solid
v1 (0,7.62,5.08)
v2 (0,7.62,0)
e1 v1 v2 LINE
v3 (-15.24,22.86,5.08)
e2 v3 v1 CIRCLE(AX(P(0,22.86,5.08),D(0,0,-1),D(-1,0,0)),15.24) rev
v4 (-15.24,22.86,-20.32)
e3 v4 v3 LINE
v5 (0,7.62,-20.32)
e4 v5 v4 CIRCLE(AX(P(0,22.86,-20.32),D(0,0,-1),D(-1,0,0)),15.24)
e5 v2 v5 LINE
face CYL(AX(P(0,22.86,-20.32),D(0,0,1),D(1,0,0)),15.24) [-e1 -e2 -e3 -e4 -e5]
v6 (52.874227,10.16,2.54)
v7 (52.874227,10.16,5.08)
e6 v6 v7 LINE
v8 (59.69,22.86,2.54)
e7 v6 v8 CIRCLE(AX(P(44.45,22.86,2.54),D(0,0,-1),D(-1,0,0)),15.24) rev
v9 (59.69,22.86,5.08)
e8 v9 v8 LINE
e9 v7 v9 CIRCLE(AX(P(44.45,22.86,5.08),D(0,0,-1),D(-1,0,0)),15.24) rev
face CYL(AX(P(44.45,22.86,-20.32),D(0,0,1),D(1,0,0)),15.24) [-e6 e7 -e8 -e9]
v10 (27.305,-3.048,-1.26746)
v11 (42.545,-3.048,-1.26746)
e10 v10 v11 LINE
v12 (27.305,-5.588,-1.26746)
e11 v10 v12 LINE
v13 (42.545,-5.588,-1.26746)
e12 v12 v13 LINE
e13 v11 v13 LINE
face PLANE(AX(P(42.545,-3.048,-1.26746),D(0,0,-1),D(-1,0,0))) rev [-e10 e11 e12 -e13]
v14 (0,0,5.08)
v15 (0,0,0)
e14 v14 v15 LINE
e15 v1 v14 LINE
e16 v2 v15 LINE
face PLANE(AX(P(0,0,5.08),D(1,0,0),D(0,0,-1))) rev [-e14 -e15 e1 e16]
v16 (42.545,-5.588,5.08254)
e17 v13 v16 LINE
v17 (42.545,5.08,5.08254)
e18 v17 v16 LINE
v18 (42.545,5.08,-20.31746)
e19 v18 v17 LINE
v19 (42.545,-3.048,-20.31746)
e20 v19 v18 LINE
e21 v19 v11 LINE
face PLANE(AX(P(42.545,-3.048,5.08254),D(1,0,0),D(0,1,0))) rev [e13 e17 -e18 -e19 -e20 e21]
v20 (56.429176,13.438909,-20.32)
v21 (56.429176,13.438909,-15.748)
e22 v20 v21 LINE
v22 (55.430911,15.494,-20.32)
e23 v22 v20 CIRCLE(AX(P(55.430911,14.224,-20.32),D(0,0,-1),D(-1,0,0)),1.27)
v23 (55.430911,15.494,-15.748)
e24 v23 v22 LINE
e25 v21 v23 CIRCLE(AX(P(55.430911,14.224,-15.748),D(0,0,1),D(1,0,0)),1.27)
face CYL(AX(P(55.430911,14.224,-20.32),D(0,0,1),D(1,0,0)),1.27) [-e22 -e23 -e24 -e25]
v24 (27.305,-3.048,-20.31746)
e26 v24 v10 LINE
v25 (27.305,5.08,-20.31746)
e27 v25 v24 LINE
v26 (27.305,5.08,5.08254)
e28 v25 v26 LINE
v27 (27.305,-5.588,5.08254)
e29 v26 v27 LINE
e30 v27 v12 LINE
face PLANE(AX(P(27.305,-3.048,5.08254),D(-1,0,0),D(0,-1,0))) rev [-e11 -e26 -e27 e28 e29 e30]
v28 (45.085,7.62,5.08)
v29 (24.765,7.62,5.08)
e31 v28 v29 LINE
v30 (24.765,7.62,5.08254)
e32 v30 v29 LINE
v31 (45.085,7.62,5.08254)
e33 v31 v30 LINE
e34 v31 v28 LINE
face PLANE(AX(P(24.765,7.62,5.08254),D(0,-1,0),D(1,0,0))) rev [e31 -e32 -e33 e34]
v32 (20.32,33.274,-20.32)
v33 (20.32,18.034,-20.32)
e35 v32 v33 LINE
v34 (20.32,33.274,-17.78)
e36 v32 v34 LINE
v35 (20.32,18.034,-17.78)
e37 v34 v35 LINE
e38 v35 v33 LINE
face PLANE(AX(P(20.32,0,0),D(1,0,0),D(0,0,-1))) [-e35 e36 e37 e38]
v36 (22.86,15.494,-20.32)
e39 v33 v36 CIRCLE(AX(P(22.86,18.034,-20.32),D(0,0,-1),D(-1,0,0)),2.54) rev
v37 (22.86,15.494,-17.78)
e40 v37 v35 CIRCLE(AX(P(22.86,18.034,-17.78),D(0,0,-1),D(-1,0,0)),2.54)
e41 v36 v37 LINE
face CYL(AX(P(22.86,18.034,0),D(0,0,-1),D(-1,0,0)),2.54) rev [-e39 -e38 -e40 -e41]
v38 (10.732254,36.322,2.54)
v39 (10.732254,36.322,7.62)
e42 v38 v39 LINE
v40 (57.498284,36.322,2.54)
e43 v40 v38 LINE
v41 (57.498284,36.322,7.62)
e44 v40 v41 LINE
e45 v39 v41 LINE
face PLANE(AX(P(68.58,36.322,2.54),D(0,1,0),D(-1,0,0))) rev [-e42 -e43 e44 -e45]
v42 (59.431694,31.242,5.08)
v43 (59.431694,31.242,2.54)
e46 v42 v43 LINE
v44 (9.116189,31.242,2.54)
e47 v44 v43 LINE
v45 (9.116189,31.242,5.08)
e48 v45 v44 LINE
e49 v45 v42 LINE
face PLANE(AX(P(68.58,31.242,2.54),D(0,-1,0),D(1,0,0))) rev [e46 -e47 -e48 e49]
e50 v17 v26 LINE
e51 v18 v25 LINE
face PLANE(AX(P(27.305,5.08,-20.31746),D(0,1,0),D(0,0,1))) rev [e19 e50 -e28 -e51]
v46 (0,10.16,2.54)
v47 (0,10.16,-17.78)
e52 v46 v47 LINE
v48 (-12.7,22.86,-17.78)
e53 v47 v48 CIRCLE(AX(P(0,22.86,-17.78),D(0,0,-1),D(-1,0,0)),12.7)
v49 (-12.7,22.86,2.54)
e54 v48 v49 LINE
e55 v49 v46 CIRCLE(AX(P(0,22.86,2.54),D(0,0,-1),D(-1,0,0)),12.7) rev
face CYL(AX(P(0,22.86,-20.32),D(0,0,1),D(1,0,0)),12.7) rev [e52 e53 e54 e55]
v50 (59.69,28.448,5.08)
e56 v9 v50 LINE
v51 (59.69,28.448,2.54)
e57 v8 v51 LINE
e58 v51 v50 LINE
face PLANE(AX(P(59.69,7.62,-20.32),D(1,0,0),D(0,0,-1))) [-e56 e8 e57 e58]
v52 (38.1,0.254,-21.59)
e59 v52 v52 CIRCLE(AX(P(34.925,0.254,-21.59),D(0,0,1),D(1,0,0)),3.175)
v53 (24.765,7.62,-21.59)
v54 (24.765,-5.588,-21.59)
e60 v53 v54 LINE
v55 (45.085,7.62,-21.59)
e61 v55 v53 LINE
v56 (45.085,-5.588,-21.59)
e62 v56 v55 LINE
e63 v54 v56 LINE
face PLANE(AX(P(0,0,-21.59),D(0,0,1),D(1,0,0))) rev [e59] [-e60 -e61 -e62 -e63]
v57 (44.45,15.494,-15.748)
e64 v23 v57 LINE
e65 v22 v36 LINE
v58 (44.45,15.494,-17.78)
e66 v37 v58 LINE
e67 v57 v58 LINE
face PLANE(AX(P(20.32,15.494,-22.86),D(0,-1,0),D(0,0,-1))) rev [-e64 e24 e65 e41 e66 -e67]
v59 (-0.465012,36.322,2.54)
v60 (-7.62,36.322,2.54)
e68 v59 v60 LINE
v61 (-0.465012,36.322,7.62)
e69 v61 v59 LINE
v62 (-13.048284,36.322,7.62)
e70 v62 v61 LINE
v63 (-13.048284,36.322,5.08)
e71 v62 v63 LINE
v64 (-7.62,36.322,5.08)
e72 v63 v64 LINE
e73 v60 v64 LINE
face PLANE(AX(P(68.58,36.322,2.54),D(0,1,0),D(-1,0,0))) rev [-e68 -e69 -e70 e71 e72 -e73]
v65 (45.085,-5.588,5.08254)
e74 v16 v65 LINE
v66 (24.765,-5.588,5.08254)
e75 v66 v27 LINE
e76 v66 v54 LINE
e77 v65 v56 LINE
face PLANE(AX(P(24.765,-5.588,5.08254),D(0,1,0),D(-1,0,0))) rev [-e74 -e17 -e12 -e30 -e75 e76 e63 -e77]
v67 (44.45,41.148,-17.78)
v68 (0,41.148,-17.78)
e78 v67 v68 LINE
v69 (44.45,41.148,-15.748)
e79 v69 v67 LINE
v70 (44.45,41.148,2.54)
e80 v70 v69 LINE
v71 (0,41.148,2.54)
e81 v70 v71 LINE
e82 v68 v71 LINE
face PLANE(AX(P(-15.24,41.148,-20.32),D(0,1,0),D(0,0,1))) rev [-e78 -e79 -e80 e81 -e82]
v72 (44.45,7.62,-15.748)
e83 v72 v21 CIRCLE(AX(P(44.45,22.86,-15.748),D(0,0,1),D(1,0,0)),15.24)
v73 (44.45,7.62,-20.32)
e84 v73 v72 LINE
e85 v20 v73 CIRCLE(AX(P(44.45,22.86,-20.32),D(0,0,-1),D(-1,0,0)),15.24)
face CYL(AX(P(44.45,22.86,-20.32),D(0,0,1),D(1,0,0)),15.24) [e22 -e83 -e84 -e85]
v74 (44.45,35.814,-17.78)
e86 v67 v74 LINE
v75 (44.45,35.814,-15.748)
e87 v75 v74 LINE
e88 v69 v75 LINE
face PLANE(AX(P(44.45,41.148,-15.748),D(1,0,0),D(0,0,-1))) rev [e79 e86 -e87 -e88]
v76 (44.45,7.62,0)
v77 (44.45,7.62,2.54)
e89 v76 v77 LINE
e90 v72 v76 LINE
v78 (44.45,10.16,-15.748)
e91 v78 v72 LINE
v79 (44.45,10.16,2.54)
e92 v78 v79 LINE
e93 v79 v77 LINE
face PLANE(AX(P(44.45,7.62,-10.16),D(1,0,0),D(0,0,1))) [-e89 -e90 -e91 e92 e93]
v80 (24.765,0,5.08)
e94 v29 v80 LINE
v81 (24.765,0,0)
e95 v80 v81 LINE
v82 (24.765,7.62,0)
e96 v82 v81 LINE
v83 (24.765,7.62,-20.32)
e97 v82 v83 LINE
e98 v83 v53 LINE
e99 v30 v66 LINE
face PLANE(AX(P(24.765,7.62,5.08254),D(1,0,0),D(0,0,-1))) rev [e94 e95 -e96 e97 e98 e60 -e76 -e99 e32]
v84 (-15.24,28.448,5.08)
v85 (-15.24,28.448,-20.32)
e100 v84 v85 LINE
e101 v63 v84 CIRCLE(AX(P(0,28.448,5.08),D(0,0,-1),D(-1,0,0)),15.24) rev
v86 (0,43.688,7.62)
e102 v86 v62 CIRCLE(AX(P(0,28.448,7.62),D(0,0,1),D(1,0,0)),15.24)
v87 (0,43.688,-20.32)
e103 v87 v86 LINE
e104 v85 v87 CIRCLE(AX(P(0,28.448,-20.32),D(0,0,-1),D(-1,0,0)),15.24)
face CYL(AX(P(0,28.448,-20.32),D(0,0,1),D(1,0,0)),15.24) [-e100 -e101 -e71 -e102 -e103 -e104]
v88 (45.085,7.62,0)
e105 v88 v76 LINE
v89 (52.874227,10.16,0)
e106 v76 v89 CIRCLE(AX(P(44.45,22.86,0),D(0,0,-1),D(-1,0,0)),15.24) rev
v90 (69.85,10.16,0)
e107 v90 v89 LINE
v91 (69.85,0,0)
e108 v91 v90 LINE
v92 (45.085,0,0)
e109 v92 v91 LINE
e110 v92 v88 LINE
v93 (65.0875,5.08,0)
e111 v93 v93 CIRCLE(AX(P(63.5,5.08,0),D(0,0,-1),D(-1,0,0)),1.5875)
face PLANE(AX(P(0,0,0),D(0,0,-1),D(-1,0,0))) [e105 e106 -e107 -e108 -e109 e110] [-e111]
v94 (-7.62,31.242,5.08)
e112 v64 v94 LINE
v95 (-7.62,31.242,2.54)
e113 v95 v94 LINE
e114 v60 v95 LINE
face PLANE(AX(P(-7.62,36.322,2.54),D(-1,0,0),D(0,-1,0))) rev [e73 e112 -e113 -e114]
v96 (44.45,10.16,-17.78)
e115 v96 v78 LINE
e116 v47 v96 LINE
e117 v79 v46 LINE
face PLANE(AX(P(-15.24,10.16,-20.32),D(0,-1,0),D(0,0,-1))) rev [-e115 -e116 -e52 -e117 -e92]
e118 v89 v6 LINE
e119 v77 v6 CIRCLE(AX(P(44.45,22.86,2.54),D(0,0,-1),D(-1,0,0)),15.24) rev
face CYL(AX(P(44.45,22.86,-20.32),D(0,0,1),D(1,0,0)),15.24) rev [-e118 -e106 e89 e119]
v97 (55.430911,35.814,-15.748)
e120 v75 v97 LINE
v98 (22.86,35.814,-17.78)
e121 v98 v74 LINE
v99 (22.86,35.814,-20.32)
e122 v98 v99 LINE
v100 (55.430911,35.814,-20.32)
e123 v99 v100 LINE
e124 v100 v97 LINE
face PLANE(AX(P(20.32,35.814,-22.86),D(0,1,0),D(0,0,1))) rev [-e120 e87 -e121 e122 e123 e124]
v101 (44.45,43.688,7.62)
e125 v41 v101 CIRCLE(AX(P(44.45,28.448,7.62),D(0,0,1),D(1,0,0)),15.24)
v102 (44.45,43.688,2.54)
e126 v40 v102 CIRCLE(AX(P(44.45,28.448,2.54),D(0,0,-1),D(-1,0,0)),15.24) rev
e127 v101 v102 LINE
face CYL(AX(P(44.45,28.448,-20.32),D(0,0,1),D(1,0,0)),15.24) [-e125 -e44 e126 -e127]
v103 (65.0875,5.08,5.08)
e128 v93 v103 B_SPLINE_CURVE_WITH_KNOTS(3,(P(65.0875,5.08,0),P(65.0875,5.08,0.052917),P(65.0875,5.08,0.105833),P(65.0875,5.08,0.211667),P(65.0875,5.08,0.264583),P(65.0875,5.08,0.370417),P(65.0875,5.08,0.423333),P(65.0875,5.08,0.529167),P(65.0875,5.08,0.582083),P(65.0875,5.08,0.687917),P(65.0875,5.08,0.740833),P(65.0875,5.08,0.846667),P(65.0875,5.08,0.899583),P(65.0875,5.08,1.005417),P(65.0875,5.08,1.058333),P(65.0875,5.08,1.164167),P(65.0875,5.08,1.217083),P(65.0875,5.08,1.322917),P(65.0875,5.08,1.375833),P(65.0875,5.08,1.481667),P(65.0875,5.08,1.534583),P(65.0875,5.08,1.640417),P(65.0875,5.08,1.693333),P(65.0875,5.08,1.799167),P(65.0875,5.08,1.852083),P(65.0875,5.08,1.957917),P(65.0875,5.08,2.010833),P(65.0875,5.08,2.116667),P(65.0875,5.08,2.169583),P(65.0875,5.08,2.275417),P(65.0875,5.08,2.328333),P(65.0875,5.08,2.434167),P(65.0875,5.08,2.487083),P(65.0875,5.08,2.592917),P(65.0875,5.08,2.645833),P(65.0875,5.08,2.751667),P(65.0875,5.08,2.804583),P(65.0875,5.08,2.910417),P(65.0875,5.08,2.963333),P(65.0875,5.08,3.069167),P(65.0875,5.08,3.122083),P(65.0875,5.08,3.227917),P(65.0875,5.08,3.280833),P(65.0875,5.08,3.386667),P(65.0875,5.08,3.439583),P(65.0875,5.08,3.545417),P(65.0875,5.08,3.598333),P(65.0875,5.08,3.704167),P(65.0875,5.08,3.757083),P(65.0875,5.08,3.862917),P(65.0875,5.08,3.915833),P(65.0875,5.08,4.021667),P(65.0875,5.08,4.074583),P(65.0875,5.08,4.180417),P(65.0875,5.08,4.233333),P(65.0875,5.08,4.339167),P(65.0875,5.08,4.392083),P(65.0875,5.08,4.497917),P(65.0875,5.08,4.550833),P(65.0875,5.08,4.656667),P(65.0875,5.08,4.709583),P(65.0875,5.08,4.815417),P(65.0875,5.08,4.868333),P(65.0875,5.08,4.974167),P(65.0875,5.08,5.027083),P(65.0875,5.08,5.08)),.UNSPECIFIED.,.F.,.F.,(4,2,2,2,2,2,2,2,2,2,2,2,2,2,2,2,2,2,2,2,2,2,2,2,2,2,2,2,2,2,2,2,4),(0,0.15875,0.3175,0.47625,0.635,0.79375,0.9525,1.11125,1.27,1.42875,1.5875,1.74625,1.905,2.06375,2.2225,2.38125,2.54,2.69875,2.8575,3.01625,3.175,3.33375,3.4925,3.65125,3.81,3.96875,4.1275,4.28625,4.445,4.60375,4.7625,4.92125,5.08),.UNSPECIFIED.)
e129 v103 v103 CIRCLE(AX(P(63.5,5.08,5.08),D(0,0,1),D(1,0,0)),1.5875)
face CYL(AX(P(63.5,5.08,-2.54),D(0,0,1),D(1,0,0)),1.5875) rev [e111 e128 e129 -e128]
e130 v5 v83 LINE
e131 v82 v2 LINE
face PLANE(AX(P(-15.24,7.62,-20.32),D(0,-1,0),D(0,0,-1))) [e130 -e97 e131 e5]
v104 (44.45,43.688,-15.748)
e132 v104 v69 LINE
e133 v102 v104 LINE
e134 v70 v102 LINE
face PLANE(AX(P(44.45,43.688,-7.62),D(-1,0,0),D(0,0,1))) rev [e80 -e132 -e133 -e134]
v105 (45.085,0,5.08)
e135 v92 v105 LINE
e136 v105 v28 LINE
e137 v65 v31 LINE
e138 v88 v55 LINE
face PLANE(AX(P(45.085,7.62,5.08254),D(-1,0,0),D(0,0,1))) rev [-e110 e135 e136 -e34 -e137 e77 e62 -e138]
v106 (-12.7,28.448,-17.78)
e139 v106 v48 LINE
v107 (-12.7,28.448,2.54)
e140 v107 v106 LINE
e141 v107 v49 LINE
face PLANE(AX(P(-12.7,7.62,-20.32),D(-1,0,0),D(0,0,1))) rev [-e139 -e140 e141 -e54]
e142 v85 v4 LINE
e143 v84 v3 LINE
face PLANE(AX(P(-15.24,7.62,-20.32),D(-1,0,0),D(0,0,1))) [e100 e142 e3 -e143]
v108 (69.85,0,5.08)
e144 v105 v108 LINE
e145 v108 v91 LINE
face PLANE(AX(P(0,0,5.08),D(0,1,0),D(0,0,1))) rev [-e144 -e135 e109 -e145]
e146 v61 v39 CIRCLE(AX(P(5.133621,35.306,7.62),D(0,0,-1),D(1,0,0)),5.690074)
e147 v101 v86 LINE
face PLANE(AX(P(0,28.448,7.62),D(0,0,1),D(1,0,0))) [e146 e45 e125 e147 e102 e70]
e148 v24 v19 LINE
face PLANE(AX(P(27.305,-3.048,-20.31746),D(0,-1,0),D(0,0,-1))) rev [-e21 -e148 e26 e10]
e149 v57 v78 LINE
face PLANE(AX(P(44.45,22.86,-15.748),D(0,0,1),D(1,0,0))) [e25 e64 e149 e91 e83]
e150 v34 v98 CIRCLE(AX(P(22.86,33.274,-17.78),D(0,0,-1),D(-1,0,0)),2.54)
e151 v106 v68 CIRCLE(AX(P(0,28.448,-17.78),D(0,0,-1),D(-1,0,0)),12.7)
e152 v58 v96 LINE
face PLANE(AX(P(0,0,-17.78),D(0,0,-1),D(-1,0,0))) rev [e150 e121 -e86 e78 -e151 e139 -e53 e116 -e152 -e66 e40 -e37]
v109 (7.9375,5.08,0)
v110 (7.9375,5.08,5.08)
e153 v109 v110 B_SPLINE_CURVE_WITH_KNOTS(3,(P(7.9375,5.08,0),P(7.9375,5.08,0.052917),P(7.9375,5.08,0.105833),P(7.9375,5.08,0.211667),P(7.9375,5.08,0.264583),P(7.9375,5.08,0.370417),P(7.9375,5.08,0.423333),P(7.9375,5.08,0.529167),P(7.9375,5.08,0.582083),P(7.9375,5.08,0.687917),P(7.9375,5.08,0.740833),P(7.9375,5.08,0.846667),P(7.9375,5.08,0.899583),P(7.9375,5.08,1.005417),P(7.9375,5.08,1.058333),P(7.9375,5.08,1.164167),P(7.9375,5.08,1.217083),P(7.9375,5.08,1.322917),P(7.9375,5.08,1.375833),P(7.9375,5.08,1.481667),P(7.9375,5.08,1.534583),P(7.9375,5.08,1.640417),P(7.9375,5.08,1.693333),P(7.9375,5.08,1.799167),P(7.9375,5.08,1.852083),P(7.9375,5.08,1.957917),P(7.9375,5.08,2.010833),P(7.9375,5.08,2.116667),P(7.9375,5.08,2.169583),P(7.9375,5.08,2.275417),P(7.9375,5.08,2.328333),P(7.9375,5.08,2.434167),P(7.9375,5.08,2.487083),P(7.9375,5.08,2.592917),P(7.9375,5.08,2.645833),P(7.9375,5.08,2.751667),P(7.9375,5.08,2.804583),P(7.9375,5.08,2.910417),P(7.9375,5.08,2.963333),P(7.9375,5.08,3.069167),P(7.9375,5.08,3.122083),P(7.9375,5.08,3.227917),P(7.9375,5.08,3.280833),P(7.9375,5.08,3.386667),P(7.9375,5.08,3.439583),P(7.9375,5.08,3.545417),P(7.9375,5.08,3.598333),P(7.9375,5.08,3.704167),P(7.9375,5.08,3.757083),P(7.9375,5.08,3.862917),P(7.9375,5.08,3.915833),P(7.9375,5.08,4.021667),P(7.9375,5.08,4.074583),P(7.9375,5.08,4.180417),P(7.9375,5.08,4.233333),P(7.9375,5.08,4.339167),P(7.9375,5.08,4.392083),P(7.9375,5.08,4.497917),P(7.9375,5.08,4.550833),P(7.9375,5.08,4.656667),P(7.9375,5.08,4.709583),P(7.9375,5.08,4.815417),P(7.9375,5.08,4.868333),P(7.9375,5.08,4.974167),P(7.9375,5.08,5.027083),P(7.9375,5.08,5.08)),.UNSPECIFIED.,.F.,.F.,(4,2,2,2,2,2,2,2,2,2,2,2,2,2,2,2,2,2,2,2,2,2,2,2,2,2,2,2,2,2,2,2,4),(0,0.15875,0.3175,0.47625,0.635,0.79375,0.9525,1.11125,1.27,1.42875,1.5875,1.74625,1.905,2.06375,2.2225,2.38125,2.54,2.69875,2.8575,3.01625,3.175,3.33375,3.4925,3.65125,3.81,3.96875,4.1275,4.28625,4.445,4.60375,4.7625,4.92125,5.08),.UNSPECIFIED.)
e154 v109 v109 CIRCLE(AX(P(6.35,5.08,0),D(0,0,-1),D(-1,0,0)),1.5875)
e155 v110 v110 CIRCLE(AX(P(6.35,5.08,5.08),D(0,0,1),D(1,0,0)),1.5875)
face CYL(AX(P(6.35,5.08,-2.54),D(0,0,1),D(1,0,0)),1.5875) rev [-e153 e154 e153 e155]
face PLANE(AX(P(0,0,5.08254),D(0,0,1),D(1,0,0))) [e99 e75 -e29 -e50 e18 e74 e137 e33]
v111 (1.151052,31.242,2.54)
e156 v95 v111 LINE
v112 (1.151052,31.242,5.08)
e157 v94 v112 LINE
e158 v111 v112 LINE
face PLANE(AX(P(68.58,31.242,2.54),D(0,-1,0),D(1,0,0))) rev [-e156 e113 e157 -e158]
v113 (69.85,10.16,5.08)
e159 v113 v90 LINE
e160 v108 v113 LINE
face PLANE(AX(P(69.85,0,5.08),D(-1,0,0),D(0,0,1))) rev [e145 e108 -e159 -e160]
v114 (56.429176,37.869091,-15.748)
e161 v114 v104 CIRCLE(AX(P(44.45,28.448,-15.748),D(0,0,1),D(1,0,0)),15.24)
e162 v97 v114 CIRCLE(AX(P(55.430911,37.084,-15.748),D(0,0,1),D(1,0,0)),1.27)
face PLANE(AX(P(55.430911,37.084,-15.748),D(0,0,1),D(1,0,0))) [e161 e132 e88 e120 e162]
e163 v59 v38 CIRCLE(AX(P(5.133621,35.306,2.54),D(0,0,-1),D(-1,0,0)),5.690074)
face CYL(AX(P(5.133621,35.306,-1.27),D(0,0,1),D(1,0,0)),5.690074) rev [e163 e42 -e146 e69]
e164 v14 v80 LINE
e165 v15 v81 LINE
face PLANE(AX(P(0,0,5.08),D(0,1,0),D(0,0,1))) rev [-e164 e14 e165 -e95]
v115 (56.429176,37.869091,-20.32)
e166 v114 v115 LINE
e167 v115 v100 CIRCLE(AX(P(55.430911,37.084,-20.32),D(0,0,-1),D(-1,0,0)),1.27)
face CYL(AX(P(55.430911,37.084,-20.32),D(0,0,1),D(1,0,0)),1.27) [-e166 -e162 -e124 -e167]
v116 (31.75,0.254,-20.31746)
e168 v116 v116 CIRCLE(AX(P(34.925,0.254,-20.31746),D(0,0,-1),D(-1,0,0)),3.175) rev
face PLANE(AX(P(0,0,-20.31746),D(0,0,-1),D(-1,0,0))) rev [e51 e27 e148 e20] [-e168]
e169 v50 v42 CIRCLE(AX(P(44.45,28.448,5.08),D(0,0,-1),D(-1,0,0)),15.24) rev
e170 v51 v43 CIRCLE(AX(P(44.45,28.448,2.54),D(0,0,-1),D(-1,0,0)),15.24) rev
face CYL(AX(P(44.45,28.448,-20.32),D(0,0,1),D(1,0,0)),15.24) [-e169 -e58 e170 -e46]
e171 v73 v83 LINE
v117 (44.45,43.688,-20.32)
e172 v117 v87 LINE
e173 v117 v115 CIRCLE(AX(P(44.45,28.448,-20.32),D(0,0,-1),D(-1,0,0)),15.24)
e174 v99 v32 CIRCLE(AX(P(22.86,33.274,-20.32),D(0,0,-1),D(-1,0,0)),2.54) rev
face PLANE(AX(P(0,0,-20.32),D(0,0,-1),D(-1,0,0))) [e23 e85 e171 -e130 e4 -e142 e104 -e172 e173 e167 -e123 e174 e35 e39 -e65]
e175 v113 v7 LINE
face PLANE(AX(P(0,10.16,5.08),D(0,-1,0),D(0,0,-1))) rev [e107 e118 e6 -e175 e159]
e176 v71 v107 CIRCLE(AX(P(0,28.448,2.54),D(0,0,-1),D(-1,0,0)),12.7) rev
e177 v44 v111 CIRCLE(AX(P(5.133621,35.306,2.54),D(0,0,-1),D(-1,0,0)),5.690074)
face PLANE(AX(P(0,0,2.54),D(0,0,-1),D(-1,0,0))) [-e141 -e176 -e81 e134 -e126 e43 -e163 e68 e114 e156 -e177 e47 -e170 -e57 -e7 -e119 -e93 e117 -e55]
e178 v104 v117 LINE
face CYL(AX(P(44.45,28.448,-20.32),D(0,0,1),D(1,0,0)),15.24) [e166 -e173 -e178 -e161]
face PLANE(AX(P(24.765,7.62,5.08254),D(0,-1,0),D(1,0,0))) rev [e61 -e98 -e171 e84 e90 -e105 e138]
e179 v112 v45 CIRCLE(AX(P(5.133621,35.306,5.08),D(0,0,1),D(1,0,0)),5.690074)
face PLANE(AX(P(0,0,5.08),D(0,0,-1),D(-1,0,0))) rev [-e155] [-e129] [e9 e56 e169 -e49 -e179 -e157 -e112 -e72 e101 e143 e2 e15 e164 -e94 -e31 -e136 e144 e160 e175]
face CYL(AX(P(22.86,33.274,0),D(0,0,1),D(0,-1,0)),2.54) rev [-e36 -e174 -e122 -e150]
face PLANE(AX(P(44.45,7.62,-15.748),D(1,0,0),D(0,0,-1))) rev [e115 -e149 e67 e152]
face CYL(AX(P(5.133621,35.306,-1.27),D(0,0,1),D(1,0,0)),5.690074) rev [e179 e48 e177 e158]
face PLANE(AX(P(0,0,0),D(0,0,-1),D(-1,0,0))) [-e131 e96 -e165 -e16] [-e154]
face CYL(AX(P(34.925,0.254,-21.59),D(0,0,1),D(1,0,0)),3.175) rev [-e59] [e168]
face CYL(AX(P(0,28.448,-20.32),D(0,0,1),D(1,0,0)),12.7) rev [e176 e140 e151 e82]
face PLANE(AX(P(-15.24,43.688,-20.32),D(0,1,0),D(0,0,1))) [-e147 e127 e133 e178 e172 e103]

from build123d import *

# Parameters (mm, degrees)
BOSS_EXTRUDE1_OUTLINE_W  = 69.85
BOSS_EXTRUDE1_OUTLINE_H  = 10.16
BOSS_EXTRUDE1_DEPTH      = 5.08
SKETCH2_W                = 74.93
SKETCH2_H                = 36.068
BOSS_EXTRUDE2_DEPTH      = 25.4
FILLET1_R                = 15.24
SHELL5_START             = -17.78
SHELL5_DEPTH             = 20.32
SKETCH8_W                = 5.08
SKETCH8_H                = 20.32
CUT_EXTRUDE1_DEPTH       = 39.37
FILLET2_R                = 2.54
FILLET3_R                = 1.27
BOSS_EXTRUDE4_DEPTH      = 0.00254
BOSS_EXTRUDE4_DEPTH_BACK = 26.67
SKETCH4_W                = 20.32
SKETCH4_H                = 13.208
SKETCH9_R                = 3.175
CUT_EXTRUDE2_DEPTH       = 87.597276135
SKETCH10_R               = 5.690074484
CUT_EXTRUDE3_DEPTH       = 6.35
SKETCH11_R               = 1.5875
CUT_EXTRUDE4_DEPTH       = 7.62
SKETCH12_W               = 76.2
SKETCH12_H               = 5.08
CUT_EXTRUDE5_DEPTH       = 2.54
BOSS_EXTRUDE5_DEPTH      = 2.032
SKETCH14_W               = 15.24
SKETCH14_H               = 6.35
CUT_EXTRUDE6_DEPTH       = 2.54
SKETCH16_W               = 15.24
SKETCH16_H               = 8.128
CUT_EXTRUDE8_DEPTH       = 25.4
BOSS_EXTRUDE6_DEPTH      = 2.54


# Read off the part's stored shape, not the designer's step: Boss-Extrude1, Shell5
with BuildPart() as part:
    # Boss-Extrude1 outline → Boss-Extrude1 (new body)
    with BuildSketch(Plane.XY):
        with Locations((34.925, 5.08)):
            Rectangle(BOSS_EXTRUDE1_OUTLINE_W, BOSS_EXTRUDE1_OUTLINE_H)
    extrude(amount=BOSS_EXTRUDE1_DEPTH)

    # Sketch2 → Boss-Extrude2 (add)
    with BuildSketch(Plane.XY.offset(5.08)):
        with Locations((22.225, 25.654)):
            Rectangle(SKETCH2_W, SKETCH2_H)
    extrude(amount=-BOSS_EXTRUDE2_DEPTH)

    # Fillet1
    fillet1_edges = [part.edges().sort_by_distance(p)[0] for p in [
        (59.69, 7.62, -10.16),
        (59.69, 43.688, -7.62),
        (-15.24, 7.62, -7.62),
        (-15.24, 43.688, -7.62),
    ]]
    fillet(fillet1_edges, radius=FILLET1_R)

    # Shell5 outline → Shell5 (cut)
    with BuildSketch(Plane.XY.offset(SHELL5_START)):
        with BuildLine():
            ThreePointArc((-12.7, 22.86), (-8.980256121, 13.879743879), (0, 10.16))
            Line((0, 10.16), (44.45, 10.16))
            Line((44.45, 10.16), (44.45, 7.62))
            ThreePointArc((44.45, 7.62), (48.849409051, 8.268810878), (52.874226968, 10.16))
            ThreePointArc((52.874226968, 10.16), (57.878380747, 15.6533232), (59.69, 22.86))
            Line((59.69, 22.86), (59.69, 28.448))
            ThreePointArc((59.69, 28.448), (55.226307345, 39.224307345), (44.45, 43.688))
            Line((44.45, 43.688), (44.45, 41.148))
            Line((44.45, 41.148), (0, 41.148))
            ThreePointArc((0, 41.148), (-8.980256121, 37.428256121), (-12.7, 28.448))
            Line((-12.7, 28.448), (-12.7, 22.86))
        make_face()
    extrude(amount=SHELL5_DEPTH, mode=Mode.SUBTRACT)

    # Sketch8 → Cut-Extrude1 (cut)
    with BuildSketch(Plane(origin=(59.69, 0, 0), x_dir=(0, 0, -1), z_dir=(1, 0, 0))):
        with Locations((20.32, 25.654)):
            Rectangle(SKETCH8_W, SKETCH8_H)
    extrude(amount=-CUT_EXTRUDE1_DEPTH, mode=Mode.SUBTRACT)

    # Fillet2
    fillet2_edges = [part.edges().sort_by_distance(p)[0] for p in [
        (20.32, 15.494, -19.05),
        (20.32, 35.814, -19.05),
    ]]
    fillet(fillet2_edges, radius=FILLET2_R)

    # Fillet3
    fillet3_edges = [part.edges().sort_by_distance(p)[0] for p in [
        (57.791650722, 35.814, -19.05),
        (57.791650722, 15.494, -19.05),
    ]]
    fillet(fillet3_edges, radius=FILLET3_R)

    # Sketch4 → Boss-Extrude4 (add, two sides: drawn at the far end of the back side and taken through both)
    with BuildSketch(Plane.XY.offset(5.08).offset(-BOSS_EXTRUDE4_DEPTH_BACK)):
        with Locations((34.925, 1.016)):
            Rectangle(SKETCH4_W, SKETCH4_H)
    extrude(amount=BOSS_EXTRUDE4_DEPTH + BOSS_EXTRUDE4_DEPTH_BACK)

    # Sketch9 → Cut-Extrude2 (cut, through all)
    with BuildSketch(Plane.XY.offset(5.08254)):
        with Locations((34.925, 0.254)):
            Circle(SKETCH9_R)
    extrude(amount=-CUT_EXTRUDE2_DEPTH, mode=Mode.SUBTRACT)

    # Sketch10 → Cut-Extrude3 (cut)
    with BuildSketch(Plane.XY.offset(5.08)):
        with Locations((5.133620521, 35.306)):
            Circle(SKETCH10_R)
    extrude(amount=-CUT_EXTRUDE3_DEPTH, mode=Mode.SUBTRACT)

    # Sketch11 → Cut-Extrude4 (cut)
    with BuildSketch(Plane.XY.offset(5.08)):
        with Locations((6.35, 5.08)):
            Circle(SKETCH11_R)
        with Locations((63.5, 5.08)):
            Circle(SKETCH11_R)
    extrude(amount=-CUT_EXTRUDE4_DEPTH, mode=Mode.SUBTRACT)

    # Sketch12 → Cut-Extrude5 (cut)
    with BuildSketch(Plane.XY.offset(5.08)):
        with Locations((30.48, 33.782)):
            Rectangle(SKETCH12_W, SKETCH12_H)
    extrude(amount=-CUT_EXTRUDE5_DEPTH, mode=Mode.SUBTRACT)

    # Sketch13 → Boss-Extrude5 (add)
    with BuildSketch(Plane.XY.offset(-17.78)):
        with BuildLine():
            Line((44.45, 41.148), (44.45, 43.688))
            ThreePointArc((44.45, 43.688), (51.108835279, 42.156300869), (56.429175518, 37.869090909))
            ThreePointArc((56.429175518, 37.869090909), (56.573269297, 36.52909706), (55.430910891, 35.814))
            Line((55.430910891, 35.814), (44.45, 35.814))
            Line((44.45, 35.814), (44.45, 41.148))
        make_face()
        with BuildLine():
            Line((44.45, 7.62), (44.45, 15.494))
            Line((44.45, 15.494), (55.430910891, 15.494))
            ThreePointArc((55.430910891, 15.494), (56.573269297, 14.77890294), (56.429175518, 13.438909091))
            ThreePointArc((56.429175518, 13.438909091), (51.108835279, 9.151699131), (44.45, 7.62))
        make_face()
    extrude(amount=BOSS_EXTRUDE5_DEPTH)

    # Sketch14 → Cut-Extrude6 (cut)
    with BuildSketch(Plane.XZ.offset(5.588)):
        with Locations((34.925, 1.90754)):
            Rectangle(SKETCH14_W, SKETCH14_H)
    extrude(amount=-CUT_EXTRUDE6_DEPTH, mode=Mode.SUBTRACT)

    # Sketch16 → Cut-Extrude8 (cut)
    with BuildSketch(Plane.XY.offset(5.08254)):
        with Locations((34.925, 1.016)):
            Rectangle(SKETCH16_W, SKETCH16_H)
    extrude(amount=-CUT_EXTRUDE8_DEPTH, mode=Mode.SUBTRACT)

    # Sketch17 → Boss-Extrude6 (add)
    with BuildSketch(Plane.XY.offset(5.08)):
        with BuildLine():
            Line((44.45, 43.688), (0, 43.688))
            ThreePointArc((0, 43.688), (-7.491923652, 41.719348085), (-13.048284332, 36.322))
            Line((-13.048284332, 36.322), (-7.62, 36.322))
            Line((-7.62, 36.322), (-0.465012494, 36.322))
            ThreePointArc((-0.465012494, 36.322), (5.133620521, 40.996074484), (10.732253536, 36.322))
            Line((10.732253536, 36.322), (57.498284332, 36.322))
            ThreePointArc((57.498284332, 36.322), (51.941923652, 41.719348085), (44.45, 43.688))
        make_face()
    extrude(amount=BOSS_EXTRUDE6_DEPTH)


solid = part.part
